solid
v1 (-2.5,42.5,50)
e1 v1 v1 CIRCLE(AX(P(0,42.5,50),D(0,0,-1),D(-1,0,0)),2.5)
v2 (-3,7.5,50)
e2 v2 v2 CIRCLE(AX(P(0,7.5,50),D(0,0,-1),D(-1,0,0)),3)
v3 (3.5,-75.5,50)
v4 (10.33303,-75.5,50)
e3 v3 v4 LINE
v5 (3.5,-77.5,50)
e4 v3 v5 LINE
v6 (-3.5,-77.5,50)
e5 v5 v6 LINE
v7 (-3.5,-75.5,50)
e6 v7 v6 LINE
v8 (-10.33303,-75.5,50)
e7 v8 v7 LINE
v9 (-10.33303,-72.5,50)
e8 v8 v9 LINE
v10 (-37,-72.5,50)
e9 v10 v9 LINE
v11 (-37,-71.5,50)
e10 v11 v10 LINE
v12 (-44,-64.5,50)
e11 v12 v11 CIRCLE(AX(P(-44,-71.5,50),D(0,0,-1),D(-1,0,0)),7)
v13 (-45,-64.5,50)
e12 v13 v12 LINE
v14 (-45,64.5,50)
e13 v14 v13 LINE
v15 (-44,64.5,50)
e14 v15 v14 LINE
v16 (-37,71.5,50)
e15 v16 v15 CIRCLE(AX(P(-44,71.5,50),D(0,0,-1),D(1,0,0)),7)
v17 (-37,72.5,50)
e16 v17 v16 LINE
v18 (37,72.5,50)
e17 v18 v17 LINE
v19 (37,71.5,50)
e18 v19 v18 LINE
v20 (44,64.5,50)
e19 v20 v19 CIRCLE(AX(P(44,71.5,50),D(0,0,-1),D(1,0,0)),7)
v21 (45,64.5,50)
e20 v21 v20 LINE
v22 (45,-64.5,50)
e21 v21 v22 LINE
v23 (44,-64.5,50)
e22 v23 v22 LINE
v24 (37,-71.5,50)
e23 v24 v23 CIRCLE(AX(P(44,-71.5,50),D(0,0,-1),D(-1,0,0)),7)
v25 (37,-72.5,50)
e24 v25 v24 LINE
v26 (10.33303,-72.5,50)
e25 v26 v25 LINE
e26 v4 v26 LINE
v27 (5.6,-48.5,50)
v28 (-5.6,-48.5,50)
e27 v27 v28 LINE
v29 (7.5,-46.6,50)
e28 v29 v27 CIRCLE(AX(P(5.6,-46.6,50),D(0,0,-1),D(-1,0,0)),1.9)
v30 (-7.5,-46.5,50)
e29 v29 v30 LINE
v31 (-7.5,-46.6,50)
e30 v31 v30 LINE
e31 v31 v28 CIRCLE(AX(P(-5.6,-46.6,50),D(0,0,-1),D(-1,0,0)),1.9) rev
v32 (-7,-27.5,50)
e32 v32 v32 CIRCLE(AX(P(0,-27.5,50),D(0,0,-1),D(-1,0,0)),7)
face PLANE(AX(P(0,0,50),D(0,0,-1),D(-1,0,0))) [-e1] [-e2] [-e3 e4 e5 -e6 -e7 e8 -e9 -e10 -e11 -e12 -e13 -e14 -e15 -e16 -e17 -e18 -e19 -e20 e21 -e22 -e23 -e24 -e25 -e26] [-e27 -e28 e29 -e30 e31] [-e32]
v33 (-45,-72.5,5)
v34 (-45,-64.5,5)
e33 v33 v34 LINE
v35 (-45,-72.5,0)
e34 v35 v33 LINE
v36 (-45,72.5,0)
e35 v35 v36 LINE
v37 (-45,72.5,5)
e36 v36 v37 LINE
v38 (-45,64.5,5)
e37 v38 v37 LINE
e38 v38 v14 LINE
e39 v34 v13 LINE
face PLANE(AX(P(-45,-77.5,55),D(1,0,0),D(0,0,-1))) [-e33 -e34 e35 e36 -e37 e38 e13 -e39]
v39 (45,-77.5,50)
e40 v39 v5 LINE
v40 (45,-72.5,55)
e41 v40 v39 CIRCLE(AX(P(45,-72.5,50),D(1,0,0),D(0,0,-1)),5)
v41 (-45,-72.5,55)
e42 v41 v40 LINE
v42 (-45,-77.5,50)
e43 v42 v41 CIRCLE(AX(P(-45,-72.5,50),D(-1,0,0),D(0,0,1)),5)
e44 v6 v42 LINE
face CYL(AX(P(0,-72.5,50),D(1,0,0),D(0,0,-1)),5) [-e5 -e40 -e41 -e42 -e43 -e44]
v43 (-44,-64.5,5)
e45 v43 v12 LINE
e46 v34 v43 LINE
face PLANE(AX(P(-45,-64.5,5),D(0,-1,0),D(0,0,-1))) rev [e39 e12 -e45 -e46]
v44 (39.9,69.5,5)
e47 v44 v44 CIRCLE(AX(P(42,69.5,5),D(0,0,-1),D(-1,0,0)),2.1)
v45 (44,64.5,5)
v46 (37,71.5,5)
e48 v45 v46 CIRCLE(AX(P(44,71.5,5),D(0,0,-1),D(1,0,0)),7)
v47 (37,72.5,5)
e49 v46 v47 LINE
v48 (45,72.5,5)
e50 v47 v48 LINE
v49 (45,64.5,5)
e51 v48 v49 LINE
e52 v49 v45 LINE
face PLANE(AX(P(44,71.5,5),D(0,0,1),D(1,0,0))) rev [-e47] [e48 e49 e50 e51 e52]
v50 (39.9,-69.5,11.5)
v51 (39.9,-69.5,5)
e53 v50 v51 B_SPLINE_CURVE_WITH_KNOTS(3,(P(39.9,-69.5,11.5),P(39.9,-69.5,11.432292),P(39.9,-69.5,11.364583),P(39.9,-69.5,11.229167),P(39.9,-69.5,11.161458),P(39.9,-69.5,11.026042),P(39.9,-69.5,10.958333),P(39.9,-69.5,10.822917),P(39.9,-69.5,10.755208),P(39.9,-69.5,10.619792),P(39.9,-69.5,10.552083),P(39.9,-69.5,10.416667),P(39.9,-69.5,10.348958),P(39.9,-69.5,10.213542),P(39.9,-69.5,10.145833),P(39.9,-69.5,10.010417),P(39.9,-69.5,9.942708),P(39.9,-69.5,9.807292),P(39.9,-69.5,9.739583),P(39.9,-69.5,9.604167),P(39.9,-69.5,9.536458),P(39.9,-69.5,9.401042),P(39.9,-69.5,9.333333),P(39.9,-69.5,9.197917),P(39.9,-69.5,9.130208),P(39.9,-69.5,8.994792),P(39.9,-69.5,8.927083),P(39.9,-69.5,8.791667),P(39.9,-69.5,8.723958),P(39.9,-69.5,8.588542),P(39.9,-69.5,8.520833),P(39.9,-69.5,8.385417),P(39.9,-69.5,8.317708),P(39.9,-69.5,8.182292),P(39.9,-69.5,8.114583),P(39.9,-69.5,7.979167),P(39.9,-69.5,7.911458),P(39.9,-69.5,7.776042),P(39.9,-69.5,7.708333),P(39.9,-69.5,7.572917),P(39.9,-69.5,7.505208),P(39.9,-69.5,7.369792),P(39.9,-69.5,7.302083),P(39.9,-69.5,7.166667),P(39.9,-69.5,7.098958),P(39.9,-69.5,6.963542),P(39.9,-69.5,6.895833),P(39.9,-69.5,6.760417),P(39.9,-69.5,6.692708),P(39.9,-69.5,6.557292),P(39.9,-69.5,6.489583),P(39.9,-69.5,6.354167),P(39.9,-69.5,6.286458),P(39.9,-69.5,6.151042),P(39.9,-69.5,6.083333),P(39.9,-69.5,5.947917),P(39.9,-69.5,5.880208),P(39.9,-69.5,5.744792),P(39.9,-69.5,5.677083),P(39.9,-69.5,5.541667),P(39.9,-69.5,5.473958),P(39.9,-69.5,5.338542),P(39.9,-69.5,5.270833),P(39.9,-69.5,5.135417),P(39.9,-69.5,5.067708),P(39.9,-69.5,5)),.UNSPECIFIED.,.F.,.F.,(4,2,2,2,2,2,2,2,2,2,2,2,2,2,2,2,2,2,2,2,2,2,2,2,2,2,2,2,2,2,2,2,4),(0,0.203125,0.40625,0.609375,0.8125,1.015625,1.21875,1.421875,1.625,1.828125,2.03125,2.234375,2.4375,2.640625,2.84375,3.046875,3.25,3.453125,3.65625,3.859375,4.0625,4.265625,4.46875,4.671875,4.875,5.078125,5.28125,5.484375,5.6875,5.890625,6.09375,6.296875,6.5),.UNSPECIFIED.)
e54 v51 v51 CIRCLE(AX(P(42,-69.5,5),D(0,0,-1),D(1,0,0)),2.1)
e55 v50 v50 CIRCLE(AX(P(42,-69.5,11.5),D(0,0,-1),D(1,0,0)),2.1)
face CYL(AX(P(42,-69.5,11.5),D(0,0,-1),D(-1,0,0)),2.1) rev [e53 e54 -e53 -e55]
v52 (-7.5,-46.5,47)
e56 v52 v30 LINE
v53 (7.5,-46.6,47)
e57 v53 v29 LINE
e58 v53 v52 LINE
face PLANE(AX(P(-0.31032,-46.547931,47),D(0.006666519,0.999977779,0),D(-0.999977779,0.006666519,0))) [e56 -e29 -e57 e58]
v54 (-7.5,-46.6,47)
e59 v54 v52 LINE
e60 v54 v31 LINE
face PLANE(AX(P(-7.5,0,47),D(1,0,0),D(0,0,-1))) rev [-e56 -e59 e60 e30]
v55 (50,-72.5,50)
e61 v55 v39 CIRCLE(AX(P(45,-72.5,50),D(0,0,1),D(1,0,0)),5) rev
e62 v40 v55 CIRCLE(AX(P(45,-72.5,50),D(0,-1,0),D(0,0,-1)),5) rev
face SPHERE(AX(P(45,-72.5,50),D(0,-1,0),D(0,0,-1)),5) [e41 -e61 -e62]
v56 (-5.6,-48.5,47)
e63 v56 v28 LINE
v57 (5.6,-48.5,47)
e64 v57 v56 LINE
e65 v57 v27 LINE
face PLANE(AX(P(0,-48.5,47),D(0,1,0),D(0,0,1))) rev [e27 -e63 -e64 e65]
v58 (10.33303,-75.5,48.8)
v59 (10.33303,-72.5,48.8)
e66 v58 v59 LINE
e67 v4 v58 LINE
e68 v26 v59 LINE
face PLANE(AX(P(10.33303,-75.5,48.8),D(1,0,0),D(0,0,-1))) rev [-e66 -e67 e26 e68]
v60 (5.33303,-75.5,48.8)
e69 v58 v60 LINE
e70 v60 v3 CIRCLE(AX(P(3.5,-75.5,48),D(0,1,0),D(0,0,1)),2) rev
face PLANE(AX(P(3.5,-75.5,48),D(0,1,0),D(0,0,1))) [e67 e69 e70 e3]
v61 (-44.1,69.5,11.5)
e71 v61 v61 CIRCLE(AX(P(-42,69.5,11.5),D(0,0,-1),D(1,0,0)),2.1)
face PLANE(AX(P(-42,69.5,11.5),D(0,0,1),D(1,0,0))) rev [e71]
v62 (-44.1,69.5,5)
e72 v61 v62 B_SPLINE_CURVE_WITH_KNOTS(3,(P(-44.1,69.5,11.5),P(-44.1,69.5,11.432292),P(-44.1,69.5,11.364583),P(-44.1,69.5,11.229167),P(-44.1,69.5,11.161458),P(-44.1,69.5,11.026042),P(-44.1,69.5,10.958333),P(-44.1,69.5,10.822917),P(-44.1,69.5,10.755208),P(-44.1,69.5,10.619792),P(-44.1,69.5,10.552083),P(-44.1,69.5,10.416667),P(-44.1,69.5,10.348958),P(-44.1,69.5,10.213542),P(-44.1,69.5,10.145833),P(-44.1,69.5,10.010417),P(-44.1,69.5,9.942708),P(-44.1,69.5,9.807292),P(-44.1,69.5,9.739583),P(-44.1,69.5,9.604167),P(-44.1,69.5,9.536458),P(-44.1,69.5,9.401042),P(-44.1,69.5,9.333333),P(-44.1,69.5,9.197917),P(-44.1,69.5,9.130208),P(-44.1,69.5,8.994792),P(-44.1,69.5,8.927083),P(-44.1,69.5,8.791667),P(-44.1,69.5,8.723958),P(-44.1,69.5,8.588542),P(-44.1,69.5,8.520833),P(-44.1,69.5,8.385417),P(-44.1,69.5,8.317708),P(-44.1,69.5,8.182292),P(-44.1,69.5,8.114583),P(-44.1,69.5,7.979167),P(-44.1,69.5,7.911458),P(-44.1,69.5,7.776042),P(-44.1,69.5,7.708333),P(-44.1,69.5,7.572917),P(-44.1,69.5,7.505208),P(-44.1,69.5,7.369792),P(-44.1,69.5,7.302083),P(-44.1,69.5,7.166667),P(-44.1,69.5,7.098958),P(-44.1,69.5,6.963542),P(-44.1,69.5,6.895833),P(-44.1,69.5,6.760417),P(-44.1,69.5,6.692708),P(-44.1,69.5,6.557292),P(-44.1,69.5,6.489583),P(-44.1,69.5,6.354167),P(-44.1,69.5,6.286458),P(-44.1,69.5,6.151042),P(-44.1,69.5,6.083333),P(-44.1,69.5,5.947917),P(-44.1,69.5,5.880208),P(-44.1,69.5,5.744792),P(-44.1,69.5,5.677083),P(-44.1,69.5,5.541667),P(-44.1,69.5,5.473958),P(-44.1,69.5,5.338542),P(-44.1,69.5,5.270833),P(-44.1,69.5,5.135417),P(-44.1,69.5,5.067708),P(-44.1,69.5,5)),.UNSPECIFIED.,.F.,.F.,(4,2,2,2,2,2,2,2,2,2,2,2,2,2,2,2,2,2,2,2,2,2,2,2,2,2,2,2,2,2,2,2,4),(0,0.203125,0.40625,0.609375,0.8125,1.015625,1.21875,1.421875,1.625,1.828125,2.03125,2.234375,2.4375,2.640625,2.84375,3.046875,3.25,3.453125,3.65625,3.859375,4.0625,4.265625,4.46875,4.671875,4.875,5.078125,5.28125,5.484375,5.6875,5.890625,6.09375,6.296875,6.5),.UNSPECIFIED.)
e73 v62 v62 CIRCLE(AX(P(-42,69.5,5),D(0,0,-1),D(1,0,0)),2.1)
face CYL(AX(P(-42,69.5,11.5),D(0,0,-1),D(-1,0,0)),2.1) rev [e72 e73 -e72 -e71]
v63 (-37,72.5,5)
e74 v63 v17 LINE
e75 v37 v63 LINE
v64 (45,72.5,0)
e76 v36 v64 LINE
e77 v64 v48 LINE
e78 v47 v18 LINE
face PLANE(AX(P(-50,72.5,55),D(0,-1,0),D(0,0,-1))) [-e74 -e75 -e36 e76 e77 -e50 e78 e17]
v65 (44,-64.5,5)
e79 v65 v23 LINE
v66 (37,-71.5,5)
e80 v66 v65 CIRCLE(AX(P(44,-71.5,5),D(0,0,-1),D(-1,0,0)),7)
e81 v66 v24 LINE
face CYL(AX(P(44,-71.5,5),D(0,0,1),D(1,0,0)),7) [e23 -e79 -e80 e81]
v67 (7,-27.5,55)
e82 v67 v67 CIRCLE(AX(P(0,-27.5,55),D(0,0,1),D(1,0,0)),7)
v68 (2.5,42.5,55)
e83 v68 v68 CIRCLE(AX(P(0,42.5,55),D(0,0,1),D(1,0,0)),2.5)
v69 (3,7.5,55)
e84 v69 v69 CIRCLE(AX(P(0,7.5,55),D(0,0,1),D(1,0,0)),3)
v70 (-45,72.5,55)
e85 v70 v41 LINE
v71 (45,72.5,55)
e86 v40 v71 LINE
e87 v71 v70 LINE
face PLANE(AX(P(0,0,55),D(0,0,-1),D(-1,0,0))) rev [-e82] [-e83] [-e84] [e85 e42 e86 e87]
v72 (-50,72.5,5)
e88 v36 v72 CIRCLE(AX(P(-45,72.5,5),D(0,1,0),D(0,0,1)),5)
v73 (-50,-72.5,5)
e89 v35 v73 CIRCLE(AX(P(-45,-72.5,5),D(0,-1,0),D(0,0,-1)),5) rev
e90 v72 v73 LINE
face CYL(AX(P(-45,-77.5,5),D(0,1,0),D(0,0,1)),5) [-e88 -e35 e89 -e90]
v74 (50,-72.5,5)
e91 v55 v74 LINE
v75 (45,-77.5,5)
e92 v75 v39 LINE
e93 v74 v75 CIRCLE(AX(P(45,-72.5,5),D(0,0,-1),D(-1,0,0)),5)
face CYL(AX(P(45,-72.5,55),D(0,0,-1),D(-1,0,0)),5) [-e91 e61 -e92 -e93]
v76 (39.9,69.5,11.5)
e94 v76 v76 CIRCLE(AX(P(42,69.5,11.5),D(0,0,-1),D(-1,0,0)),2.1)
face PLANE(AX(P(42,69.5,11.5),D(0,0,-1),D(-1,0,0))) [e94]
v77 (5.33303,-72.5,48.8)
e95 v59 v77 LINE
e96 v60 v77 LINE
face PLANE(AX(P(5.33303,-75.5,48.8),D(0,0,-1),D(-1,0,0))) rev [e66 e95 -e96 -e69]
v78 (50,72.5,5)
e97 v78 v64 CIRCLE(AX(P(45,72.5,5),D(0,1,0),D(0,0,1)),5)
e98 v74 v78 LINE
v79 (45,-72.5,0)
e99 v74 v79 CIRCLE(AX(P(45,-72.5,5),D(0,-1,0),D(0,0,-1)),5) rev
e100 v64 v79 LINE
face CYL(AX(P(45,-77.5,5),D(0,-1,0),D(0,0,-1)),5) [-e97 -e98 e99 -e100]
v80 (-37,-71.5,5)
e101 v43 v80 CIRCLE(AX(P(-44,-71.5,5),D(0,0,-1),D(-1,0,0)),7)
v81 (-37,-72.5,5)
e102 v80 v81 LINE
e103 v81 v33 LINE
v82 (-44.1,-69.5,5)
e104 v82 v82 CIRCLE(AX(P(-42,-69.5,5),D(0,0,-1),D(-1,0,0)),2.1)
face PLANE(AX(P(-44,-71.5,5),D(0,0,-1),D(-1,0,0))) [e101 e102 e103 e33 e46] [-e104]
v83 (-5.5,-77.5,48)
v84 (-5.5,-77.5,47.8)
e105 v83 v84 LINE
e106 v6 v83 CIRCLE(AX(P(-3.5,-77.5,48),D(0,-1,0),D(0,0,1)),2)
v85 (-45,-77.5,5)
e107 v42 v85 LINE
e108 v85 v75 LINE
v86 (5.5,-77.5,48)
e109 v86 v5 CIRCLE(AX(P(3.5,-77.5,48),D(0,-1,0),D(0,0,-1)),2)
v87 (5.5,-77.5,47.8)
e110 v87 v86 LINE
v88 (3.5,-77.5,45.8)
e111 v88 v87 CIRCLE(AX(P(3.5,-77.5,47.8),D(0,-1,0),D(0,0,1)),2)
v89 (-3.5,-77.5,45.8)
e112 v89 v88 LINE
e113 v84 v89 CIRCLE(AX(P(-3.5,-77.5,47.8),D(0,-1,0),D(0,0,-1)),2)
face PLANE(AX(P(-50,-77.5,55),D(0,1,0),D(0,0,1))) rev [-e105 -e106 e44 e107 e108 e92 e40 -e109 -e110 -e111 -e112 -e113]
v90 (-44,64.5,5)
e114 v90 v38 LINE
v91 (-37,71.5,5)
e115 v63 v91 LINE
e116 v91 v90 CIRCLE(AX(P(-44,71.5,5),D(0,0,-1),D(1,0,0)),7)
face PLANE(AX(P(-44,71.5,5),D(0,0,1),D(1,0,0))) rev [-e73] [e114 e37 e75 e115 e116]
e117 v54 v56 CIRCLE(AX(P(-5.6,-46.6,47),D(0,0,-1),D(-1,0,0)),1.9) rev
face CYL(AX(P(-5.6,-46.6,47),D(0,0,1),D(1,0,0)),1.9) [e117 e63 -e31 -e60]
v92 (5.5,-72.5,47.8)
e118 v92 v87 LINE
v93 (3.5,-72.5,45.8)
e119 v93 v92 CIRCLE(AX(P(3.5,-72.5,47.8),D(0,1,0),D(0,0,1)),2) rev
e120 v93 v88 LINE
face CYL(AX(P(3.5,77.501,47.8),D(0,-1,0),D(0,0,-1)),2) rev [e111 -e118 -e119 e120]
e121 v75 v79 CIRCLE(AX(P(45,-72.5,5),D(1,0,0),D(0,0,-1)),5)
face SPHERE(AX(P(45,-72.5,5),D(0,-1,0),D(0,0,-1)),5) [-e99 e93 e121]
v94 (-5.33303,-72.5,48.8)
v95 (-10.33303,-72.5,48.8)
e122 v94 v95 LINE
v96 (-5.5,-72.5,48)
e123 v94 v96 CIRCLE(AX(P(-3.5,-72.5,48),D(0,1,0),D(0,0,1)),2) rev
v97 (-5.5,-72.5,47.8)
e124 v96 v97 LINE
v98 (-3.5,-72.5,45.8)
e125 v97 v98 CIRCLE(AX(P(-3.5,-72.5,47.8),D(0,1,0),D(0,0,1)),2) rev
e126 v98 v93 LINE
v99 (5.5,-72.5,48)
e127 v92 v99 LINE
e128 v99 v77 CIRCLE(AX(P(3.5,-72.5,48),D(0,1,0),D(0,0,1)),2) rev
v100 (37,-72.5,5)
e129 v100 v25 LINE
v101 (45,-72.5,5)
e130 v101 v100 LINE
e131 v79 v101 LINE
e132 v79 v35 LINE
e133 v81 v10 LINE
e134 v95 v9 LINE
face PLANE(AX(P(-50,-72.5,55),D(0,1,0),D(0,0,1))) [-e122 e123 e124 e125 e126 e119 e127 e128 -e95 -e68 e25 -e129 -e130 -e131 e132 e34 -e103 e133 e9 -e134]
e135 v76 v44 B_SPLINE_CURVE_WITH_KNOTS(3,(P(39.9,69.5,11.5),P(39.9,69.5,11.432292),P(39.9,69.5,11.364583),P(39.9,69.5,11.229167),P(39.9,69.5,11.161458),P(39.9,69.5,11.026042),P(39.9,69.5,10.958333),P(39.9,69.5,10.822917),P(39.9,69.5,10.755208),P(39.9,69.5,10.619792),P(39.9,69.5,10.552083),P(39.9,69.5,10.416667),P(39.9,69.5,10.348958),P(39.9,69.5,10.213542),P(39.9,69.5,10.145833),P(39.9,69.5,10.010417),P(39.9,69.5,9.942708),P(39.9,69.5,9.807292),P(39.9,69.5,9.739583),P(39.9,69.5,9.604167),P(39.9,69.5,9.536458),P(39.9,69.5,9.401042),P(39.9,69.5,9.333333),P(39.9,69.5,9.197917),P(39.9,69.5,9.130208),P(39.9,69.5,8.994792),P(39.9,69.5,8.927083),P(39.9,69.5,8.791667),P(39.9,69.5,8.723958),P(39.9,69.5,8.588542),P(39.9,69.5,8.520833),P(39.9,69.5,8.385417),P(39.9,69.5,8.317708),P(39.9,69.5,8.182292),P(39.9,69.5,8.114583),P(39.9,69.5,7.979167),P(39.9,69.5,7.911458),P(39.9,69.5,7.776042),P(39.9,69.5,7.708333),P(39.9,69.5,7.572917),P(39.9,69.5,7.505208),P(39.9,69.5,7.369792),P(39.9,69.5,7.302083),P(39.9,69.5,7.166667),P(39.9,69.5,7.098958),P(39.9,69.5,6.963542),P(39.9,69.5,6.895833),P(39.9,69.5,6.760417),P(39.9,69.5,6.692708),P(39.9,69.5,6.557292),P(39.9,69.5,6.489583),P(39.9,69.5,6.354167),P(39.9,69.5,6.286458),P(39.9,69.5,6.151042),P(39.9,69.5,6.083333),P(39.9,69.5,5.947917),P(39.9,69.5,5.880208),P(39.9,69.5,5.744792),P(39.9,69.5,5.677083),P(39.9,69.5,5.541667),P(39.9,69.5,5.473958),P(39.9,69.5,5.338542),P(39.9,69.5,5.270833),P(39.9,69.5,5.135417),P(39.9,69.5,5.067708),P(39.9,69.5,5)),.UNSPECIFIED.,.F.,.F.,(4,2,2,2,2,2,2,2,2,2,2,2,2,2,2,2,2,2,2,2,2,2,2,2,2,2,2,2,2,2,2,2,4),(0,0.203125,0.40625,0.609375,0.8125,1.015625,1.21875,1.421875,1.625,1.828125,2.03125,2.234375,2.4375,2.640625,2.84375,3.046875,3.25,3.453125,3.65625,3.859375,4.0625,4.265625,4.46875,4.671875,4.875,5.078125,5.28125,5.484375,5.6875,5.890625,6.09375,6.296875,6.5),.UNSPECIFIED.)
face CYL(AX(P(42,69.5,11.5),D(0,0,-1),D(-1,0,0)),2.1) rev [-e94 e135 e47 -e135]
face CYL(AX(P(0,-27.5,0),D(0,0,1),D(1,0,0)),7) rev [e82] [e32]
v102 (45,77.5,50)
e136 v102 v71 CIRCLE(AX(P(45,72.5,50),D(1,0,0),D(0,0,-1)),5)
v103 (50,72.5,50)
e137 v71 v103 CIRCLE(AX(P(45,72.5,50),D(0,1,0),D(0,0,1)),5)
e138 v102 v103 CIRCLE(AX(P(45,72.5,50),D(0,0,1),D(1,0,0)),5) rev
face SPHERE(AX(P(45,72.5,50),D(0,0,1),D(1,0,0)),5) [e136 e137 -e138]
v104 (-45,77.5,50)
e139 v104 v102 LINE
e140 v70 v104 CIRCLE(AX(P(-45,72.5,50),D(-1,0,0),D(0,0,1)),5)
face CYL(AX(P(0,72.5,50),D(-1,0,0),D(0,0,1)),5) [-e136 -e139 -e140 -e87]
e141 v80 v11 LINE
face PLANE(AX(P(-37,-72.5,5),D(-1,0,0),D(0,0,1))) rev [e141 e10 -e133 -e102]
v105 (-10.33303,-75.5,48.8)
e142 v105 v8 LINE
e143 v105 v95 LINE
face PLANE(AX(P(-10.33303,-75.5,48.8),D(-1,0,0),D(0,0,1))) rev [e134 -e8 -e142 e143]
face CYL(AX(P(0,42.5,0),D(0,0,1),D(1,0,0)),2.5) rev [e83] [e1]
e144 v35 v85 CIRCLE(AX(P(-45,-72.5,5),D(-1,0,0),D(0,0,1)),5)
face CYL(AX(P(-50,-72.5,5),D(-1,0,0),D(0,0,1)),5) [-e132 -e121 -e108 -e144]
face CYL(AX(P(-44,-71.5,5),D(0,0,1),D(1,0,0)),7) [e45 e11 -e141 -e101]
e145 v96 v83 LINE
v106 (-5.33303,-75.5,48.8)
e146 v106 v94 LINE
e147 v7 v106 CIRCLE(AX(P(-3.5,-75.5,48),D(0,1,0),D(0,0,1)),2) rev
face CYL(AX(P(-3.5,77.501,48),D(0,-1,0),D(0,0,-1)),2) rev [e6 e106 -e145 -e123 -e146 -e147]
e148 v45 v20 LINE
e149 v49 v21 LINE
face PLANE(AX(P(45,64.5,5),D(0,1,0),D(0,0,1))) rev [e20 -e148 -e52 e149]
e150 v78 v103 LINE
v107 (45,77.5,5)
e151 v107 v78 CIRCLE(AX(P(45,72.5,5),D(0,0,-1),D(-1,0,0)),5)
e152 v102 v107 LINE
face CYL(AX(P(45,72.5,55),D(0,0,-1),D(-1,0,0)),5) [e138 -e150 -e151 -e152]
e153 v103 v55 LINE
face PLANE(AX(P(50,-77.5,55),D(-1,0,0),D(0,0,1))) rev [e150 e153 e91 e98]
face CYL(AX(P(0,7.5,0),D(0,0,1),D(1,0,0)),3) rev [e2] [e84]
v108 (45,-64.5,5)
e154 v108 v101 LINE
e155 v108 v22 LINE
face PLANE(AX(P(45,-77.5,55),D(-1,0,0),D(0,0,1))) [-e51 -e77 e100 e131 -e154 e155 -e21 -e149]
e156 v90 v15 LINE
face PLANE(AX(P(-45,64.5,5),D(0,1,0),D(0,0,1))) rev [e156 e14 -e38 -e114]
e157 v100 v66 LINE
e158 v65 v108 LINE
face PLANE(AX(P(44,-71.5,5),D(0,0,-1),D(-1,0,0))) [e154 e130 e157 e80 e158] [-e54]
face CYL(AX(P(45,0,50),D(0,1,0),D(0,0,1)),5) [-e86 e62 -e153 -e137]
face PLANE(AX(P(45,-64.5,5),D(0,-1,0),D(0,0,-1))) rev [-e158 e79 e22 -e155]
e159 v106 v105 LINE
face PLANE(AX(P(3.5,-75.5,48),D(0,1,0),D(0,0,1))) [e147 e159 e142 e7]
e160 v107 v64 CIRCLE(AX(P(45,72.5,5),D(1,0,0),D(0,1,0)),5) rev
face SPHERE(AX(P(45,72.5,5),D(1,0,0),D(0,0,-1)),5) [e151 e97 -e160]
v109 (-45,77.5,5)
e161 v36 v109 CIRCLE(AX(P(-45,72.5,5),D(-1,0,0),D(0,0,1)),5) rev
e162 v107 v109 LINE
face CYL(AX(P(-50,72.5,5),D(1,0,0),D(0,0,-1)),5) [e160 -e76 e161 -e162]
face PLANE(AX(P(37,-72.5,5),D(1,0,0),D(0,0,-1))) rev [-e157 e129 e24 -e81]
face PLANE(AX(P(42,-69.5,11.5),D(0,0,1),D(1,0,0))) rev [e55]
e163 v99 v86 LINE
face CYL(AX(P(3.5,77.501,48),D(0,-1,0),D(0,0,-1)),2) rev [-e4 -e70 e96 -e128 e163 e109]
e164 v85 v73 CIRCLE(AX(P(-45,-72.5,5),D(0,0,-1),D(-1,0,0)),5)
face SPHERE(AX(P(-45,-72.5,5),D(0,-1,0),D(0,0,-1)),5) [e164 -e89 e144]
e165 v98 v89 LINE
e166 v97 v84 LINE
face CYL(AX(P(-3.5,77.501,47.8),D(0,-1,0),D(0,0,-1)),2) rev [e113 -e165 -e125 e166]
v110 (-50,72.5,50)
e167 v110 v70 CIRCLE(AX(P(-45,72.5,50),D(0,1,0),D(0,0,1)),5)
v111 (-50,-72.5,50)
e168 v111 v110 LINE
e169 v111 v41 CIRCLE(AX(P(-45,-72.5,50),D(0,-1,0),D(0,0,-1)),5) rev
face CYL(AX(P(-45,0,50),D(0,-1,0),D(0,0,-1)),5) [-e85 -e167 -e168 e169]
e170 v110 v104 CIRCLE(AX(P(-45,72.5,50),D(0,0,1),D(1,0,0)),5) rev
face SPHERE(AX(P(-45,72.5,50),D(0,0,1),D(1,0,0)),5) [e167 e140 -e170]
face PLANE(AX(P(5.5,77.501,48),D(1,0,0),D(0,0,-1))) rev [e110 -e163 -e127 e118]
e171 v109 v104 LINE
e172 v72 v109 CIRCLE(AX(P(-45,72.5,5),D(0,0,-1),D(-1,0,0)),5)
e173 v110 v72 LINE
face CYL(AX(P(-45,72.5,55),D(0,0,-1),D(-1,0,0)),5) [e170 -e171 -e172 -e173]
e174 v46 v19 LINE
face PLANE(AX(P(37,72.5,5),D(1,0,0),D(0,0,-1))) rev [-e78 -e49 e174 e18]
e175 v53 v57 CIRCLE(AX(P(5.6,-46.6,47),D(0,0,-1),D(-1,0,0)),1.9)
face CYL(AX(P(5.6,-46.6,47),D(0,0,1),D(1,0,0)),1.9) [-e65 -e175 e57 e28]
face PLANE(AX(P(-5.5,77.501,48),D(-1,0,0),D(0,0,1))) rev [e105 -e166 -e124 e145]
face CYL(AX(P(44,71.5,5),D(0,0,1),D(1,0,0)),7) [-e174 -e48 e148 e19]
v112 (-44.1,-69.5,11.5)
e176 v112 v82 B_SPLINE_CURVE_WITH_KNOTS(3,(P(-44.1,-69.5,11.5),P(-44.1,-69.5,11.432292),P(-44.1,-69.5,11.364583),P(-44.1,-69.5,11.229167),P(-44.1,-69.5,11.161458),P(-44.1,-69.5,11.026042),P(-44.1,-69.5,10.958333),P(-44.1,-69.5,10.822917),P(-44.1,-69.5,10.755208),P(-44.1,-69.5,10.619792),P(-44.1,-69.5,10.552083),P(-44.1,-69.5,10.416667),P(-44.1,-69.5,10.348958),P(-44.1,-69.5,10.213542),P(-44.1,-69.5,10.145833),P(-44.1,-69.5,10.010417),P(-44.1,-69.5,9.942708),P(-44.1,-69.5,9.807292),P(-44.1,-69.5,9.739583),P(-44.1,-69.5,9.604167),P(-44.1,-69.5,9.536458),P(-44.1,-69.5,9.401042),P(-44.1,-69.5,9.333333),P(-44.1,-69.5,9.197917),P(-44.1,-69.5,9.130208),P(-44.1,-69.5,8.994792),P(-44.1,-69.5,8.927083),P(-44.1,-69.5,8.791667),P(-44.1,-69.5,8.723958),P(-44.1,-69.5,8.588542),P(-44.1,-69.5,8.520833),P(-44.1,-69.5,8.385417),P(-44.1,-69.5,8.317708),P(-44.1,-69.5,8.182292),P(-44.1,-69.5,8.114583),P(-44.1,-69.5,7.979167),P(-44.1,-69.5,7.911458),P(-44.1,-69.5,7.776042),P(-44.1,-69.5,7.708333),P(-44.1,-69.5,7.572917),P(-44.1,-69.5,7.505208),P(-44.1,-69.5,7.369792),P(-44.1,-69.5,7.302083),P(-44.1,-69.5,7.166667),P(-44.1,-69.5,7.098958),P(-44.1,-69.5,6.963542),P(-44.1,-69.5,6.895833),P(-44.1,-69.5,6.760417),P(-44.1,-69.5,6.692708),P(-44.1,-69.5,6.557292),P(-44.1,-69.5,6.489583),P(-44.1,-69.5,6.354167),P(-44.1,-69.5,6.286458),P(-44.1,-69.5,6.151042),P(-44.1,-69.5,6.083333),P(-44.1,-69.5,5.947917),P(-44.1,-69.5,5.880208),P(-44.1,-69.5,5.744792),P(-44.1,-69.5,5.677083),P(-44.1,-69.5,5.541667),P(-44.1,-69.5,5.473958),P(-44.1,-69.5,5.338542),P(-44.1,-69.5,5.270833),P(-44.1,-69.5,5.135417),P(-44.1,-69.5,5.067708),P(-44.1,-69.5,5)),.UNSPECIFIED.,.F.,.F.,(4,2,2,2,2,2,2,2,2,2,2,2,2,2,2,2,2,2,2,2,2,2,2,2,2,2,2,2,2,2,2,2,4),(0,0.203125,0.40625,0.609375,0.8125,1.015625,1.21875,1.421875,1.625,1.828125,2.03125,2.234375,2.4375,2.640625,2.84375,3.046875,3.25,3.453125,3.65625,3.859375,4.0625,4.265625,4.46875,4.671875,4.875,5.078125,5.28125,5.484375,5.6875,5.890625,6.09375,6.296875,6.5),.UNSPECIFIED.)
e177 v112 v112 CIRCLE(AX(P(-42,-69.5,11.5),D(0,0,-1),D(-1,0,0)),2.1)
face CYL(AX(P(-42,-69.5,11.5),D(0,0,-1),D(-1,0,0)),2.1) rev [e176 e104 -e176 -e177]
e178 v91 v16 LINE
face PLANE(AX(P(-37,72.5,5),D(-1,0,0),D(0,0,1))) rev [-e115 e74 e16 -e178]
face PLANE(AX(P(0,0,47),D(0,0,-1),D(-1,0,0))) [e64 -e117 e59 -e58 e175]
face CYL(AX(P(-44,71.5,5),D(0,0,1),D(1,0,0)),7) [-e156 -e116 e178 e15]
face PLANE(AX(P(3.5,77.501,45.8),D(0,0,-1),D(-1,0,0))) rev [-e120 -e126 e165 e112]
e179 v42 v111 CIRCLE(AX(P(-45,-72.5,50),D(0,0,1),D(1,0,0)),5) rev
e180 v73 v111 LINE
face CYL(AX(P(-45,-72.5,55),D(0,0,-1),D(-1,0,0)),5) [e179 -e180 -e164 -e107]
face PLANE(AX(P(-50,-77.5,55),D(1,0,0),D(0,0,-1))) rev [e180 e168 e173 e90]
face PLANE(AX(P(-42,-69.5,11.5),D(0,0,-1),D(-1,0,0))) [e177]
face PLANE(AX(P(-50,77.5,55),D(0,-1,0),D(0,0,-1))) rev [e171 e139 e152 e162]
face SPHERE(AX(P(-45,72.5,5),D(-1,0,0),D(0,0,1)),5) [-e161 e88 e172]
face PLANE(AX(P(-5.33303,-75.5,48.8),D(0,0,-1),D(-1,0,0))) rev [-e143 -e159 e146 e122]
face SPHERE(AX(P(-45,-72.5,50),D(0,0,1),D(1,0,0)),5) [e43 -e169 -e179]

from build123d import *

# Parameters (mm, degrees)
SKETCH6_W           = 100
SKETCH6_H           = 155
BOSS_EXTRUDE5_DEPTH = 55
FILLET2_R           = 5
SHELL3_START        = -45
SHELL3_OUTLINE_W    = 145
SHELL3_OUTLINE_H    = 50
SHELL3_DEPTH        = 90
BOSS_EXTRUDE6_DEPTH = 45
SKETCH8_R           = 2.1
CUT_EXTRUDE1_DEPTH  = 6.5
SKETCH9_R           = 2.5
SKETCH9_R_2         = 3
SKETCH9_R_3         = 7
CUT_EXTRUDE2_DEPTH  = 108.383657975
CUT_EXTRUDE3_REACH  = 173.901
CUT_EXTRUDE4_START  = -3
CUT_EXTRUDE4_DEPTH  = 3
BOSS_EXTRUDE7_DEPTH = 3


# Read off the part's stored shape, not the designer's step: Shell3
with BuildPart() as part:
    # Sketch6 → Boss-Extrude5 (new body)
    with BuildSketch(Plane.XY):
        Rectangle(SKETCH6_W, SKETCH6_H)
    extrude(amount=BOSS_EXTRUDE5_DEPTH)

    # Fillet2
    fillet2_edges = [part.edges().sort_by_distance(p)[0] for p in [
        (-50, 0, 55),
        (0, -77.5, 55),
        (50, 0, 55),
        (0, -77.5, 0),
        (-50, 0, 0),
        (0, 77.5, 0),
        (50, 0, 0),
        (50, -77.5, 27.5),
        (-50, -77.5, 27.5),
        (-50, 77.5, 27.5),
        (50, 77.5, 27.5),
        (0, 77.5, 55),
    ]]
    fillet(fillet2_edges, radius=FILLET2_R)

    # Shell3 outline → Shell3 (cut)
    with BuildSketch(Plane.YZ.offset(SHELL3_START)):
        with Locations((0, 25)):
            Rectangle(SHELL3_OUTLINE_W, SHELL3_OUTLINE_H)
    extrude(amount=SHELL3_DEPTH, mode=Mode.SUBTRACT)

    # Sketch7 → Boss-Extrude6 (add)
    with BuildSketch(Plane(origin=(0, 0, 50), x_dir=(-1, 0, 0), z_dir=(0, 0, -1))):
        with BuildLine():
            Line((-45, 72.5), (-37, 72.5))
            Line((-37, 72.5), (-37, 71.5))
            ThreePointArc((-37, 71.5), (-39.050252532, 66.550252532), (-44, 64.5))
            Line((-44, 64.5), (-45, 64.5))
            Line((-45, 64.5), (-45, 72.5))
        make_face()
        with BuildLine():
            Line((45, 72.5), (37, 72.5))
            Line((37, 72.5), (37, 71.5))
            ThreePointArc((37, 71.5), (39.050252532, 66.550252532), (44, 64.5))
            Line((44, 64.5), (45, 64.5))
            Line((45, 64.5), (45, 72.5))
        make_face()
        with BuildLine():
            Line((-45, -64.5), (-44, -64.5))
            ThreePointArc((-44, -64.5), (-39.050252532, -66.550252532), (-37, -71.5))
            Line((-37, -71.5), (-37, -72.5))
            Line((-37, -72.5), (-45, -72.5))
            Line((-45, -72.5), (-45, -64.5))
        make_face()
        with BuildLine():
            Line((45, -72.5), (45, -64.5))
            Line((45, -64.5), (44, -64.5))
            ThreePointArc((44, -64.5), (39.050252532, -66.550252532), (37, -71.5))
            Line((37, -71.5), (37, -72.5))
            Line((37, -72.5), (45, -72.5))
        make_face()
    extrude(amount=BOSS_EXTRUDE6_DEPTH)

    # Sketch8 → Cut-Extrude1 (cut)
    with BuildSketch(Plane(origin=(0, 0, 5), x_dir=(-1, 0, 0), z_dir=(0, 0, -1))):
        with Locations((-42, 69.5)):
            Circle(SKETCH8_R)
        with Locations((42, 69.5)):
            Circle(SKETCH8_R)
        with Locations((42, -69.5)):
            Circle(SKETCH8_R)
        with Locations((-42, -69.5)):
            Circle(SKETCH8_R)
    extrude(amount=-CUT_EXTRUDE1_DEPTH, mode=Mode.SUBTRACT)

    # Sketch9 → Cut-Extrude2 (cut, through all)
    with BuildSketch(Plane.XY.offset(55)):
        with Locations((0, 42.5)):
            Circle(SKETCH9_R)
        with Locations((0, 7.5)):
            Circle(SKETCH9_R_2)
        with Locations((0, -27.5)):
            Circle(SKETCH9_R_3)
    extrude(amount=-CUT_EXTRUDE2_DEPTH, mode=Mode.SUBTRACT)

    # Sketch10 → Cut-Extrude3 (cut, up to next)
    with BuildSketch(Plane.XZ.offset(77.5), mode=Mode.PRIVATE) as cut_extrude3_sk1:
        with BuildLine():
            Line((-3.5, 50), (3.5, 50))
            ThreePointArc((3.5, 50), (4.914213562, 49.414213562), (5.5, 48))
            Line((5.5, 48), (5.5, 47.8))
            ThreePointArc((5.5, 47.8), (4.914213562, 46.385786438), (3.5, 45.8))
            Line((3.5, 45.8), (-3.5, 45.8))
            ThreePointArc((-3.5, 45.8), (-4.914213562, 46.385786438), (-5.5, 47.8))
            Line((-5.5, 47.8), (-5.5, 48))
            ThreePointArc((-5.5, 48), (-4.914213562, 49.414213562), (-3.5, 50))
        make_face()
    cut_extrude3_tool1 = extrude(cut_extrude3_sk1.sketch, amount=-CUT_EXTRUDE3_REACH, mode=Mode.PRIVATE) & part.part
    add(cut_extrude3_tool1.solids().sort_by_distance((0, -77.5, 47.9))[0], mode=Mode.SUBTRACT)

    # Sketch13 → Cut-Extrude4 (cut)
    with BuildSketch(Plane(origin=(0, -72.5, 0), x_dir=(1, 0, 0), z_dir=(0, 1, 0)).offset(CUT_EXTRUDE4_START)):
        with BuildLine():
            Line((5.5, -47.8), (5.5, -48))
            ThreePointArc((5.5, -48), (5.457812626, -48.408619287), (5.333030278, -48.8))
            Line((5.333030278, -48.8), (10.333030278, -48.8))
            Line((10.333030278, -48.8), (10.333030278, -50))
            Line((10.333030278, -50), (3.5, -50))
            Line((3.5, -50), (-3.5, -50))
            Line((-3.5, -50), (-10.333030278, -50))
            Line((-10.333030278, -50), (-10.333030278, -48.8))
            Line((-10.333030278, -48.8), (-5.333030278, -48.8))
            ThreePointArc((-5.333030278, -48.8), (-5.457812626, -48.408619287), (-5.5, -48))
            Line((-5.5, -48), (-5.5, -47.8))
            ThreePointArc((-5.5, -47.8), (-4.914213562, -46.385786438), (-3.5, -45.8))
            Line((-3.5, -45.8), (3.5, -45.8))
            ThreePointArc((3.5, -45.8), (4.914213562, -46.385786438), (5.5, -47.8))
        make_face()
    extrude(amount=CUT_EXTRUDE4_DEPTH, mode=Mode.SUBTRACT)

    # Sketch14 → Boss-Extrude7 (add)
    with BuildSketch(Plane(origin=(0, 0, 50), x_dir=(-1, 0, 0), z_dir=(0, 0, -1))):
        with BuildLine():
            Line((-7.5, -46.6), (7.5, -46.5))
            Line((7.5, -46.5), (7.5, -46.6))
            ThreePointArc((7.5, -46.6), (6.943502884, -47.943502884), (5.6, -48.5))
            Line((5.6, -48.5), (-5.6, -48.5))
            ThreePointArc((-5.6, -48.5), (-6.943502884, -47.943502884), (-7.5, -46.6))
        make_face()
    extrude(amount=BOSS_EXTRUDE7_DEPTH)


solid = part.part
